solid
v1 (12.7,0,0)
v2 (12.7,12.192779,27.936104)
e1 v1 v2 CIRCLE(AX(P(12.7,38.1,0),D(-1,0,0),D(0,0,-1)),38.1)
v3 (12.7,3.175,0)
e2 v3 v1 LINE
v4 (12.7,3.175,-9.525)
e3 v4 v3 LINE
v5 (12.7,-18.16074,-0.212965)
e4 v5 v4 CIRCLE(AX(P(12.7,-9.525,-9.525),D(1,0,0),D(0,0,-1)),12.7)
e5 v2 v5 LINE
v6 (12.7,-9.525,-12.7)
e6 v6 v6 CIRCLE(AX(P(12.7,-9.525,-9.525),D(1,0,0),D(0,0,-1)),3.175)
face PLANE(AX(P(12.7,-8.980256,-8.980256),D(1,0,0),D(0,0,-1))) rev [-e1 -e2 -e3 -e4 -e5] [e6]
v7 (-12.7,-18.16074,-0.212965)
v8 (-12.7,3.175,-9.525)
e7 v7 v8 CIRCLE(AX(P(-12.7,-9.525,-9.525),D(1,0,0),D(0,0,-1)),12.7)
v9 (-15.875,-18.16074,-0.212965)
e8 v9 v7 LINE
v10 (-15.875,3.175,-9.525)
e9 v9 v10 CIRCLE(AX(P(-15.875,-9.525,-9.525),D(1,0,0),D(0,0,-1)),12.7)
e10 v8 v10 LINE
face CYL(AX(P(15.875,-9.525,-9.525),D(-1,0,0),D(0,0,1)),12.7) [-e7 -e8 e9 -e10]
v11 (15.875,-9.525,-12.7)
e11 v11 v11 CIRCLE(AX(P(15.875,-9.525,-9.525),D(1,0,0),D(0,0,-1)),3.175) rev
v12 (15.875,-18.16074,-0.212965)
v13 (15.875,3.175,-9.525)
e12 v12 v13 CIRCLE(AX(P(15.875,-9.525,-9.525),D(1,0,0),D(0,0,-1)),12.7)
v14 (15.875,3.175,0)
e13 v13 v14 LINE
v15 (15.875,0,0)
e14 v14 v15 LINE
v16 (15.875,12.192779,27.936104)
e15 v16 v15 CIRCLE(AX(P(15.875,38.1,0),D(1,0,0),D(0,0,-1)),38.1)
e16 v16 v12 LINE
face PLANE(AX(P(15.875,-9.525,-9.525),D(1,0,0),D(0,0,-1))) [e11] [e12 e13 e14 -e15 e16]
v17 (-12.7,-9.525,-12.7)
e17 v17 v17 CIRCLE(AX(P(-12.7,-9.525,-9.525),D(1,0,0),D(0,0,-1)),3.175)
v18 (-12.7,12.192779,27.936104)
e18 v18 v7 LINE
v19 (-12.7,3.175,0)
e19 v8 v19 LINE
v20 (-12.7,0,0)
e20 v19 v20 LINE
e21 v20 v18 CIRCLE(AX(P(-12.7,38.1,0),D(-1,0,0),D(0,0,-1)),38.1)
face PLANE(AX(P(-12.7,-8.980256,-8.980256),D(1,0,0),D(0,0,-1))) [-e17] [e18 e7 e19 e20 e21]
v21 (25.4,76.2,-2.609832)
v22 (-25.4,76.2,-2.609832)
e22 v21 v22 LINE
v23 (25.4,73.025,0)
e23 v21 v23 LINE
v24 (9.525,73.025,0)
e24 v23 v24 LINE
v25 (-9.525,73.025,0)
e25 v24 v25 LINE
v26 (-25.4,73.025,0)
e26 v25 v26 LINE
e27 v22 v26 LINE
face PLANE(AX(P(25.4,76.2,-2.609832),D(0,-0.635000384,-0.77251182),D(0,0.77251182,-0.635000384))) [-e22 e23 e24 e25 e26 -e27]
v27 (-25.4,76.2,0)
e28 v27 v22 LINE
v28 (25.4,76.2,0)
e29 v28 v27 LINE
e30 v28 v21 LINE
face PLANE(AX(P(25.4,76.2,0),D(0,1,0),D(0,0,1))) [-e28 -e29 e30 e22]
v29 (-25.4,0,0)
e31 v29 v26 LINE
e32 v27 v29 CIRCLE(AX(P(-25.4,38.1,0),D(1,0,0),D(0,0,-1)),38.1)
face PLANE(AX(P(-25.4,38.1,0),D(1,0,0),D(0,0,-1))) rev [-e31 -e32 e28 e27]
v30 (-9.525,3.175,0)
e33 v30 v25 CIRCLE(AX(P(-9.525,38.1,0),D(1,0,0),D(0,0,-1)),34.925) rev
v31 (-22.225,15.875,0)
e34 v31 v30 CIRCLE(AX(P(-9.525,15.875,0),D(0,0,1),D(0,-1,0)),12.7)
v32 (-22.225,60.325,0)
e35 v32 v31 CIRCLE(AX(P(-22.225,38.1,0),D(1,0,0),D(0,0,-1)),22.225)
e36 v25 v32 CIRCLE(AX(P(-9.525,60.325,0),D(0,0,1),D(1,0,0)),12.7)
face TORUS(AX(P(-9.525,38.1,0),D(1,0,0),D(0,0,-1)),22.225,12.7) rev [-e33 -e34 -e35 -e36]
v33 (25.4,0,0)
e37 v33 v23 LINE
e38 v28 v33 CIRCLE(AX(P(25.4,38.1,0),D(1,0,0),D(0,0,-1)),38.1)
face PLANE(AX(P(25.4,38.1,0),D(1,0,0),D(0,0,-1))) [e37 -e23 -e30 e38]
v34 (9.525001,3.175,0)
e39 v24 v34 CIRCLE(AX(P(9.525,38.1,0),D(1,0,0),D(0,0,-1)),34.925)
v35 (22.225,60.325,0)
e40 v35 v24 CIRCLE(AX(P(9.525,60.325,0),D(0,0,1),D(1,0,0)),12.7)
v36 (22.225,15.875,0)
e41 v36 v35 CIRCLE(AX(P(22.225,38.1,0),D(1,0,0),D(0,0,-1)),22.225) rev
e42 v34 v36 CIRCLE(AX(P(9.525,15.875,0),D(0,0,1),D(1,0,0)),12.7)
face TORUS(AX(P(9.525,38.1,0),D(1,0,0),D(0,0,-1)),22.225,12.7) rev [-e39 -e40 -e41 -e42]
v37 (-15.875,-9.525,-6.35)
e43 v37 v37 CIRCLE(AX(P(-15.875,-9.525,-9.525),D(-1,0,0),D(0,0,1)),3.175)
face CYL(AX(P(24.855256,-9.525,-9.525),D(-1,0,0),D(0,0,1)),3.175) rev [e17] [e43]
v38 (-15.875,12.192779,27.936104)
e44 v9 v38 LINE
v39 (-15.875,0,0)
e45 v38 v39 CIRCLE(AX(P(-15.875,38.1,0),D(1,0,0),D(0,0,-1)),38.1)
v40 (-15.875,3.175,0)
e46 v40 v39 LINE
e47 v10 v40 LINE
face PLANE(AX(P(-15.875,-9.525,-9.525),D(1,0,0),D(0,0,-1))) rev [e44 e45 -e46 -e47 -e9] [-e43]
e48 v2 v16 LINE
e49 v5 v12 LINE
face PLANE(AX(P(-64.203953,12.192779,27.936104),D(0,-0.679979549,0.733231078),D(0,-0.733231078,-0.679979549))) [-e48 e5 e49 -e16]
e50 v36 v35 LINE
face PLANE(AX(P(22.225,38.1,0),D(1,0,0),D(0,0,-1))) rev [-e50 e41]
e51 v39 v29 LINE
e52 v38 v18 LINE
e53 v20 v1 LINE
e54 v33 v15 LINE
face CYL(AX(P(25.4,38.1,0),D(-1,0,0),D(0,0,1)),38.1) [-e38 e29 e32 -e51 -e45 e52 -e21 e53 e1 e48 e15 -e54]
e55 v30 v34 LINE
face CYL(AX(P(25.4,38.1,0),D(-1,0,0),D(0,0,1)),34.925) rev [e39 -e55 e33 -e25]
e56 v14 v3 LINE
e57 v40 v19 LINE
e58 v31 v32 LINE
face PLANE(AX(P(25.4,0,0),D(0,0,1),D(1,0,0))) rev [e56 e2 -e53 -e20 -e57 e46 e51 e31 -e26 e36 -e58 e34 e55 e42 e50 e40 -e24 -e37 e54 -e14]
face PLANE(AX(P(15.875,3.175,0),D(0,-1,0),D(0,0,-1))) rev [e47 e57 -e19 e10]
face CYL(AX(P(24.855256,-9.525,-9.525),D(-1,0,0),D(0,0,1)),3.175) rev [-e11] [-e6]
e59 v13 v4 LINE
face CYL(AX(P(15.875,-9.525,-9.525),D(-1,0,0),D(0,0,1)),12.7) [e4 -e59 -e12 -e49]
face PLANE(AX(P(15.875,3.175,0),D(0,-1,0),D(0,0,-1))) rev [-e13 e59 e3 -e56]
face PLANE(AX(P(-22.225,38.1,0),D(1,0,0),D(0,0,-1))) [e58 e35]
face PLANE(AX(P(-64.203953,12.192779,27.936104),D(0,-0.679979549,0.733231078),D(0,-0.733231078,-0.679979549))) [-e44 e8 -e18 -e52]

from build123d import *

# Parameters (mm, degrees)
BOSS_EXTRUDE1_DEPTH = 25.4
SHELL1_T            = -3.175
SKETCH4_R           = 12.7
BOSS_EXTRUDE3_DEPTH = 15.875
BOSS_EXTRUDE4_DEPTH = 15.875
SKETCH6_R           = 12.7
CUT_EXTRUDE2_DEPTH  = 12.7
CUT_EXTRUDE3_START  = 12.7
SKETCH6_2_R         = 12.7
CUT_EXTRUDE3_DEPTH  = 12.7
CUT_EXTRUDE4_REACH  = 96.666
SKETCH7_R           = 3.175
BOSS_EXTRUDE5_REACH = 96.666
CUT_EXTRUDE5_DEPTH  = 12.7
BOSS_EXTRUDE6_DEPTH = 25.4
FILLET2_R           = 12.7


with BuildPart() as part:
    # Sketch2 → Boss-Extrude1 (new, symmetric)
    with BuildSketch(Plane(origin=(0, 0, 0), x_dir=(0, 0, -1), z_dir=(1, 0, 0))):
        with BuildLine():
            Line((0, 0), (0, 76.2))
            ThreePointArc((0, 76.2), (-38.1, 38.1), (0, 0))
        make_face()
    extrude(amount=BOSS_EXTRUDE1_DEPTH, both=True)

    # Shell1
    shell1_openings = [part.faces().sort_by_distance(p)[0] for p in [
        (0, 38.1, 0),
    ]]
    offset(amount=SHELL1_T, openings=shell1_openings)



with BuildPart() as body_2:
    # Sketch4 → Boss-Extrude3 (new, symmetric)
    with BuildSketch(Plane(origin=(0, 0, 0), x_dir=(0, 0, -1), z_dir=(1, 0, 0))):
        with Locations((9.525, -9.525)):
            Circle(SKETCH4_R)
    extrude(amount=BOSS_EXTRUDE3_DEPTH, both=True)


with BuildPart() as part_1:
    add(part.part)

    add(body_2.part)  # Boss-Extrude4 merges body 2
    # Sketch5 → Boss-Extrude4 (add, symmetric)
    with BuildSketch(Plane(origin=(0, 0, 0), x_dir=(0, 0, -1), z_dir=(1, 0, 0))):
        with BuildLine():
            Line((0, 3.175), (0, 0))
            Line((0, 0), (1.124739587, 0))
            ThreePointArc((1.124739587, 0), (5.034871939, 2.354762203), (9.525, 3.175))
            Line((9.525, 3.175), (0, 3.175))
        make_face()
    extrude(amount=BOSS_EXTRUDE4_DEPTH, both=True)

    # Sketch6 → Cut-Extrude2 (cut)
    with BuildSketch(Plane(origin=(0, 0, 0), x_dir=(0, 0, -1), z_dir=(1, 0, 0))):
        with Locations((8.980256121, -8.980256121)):
            Circle(SKETCH6_R)
    extrude(amount=-CUT_EXTRUDE2_DEPTH, mode=Mode.SUBTRACT)

    # Sketch6<2> → Cut-Extrude3 (cut)
    with BuildSketch(Plane(origin=(0, 0, 0), x_dir=(0, 0, -1), z_dir=(1, 0, 0)).offset(CUT_EXTRUDE3_START)):
        with Locations((8.980256121, -8.980256121)):
            Circle(SKETCH6_2_R)
    extrude(amount=-CUT_EXTRUDE3_DEPTH, mode=Mode.SUBTRACT)

    # Cut-Extrude4: up to this face of the body (flat: up to its plane)
    cut_extrude4_end = Plane(part_1.part.faces().sort_by_distance((15.875, -9.258016607, -9.360446087))[0])
    # Sketch7 → Cut-Extrude4 (cut, up to the picked face)
    with BuildSketch(Plane.ZY.offset(15.875), mode=Mode.PRIVATE) as cut_extrude4_sk1:
        with Locations(Location((-9.525, -9.525, 0), (0, 0, 180))):
            Circle(SKETCH7_R)
    cut_extrude4_tool1 = split(extrude(cut_extrude4_sk1.sketch, amount=-CUT_EXTRUDE4_REACH, mode=Mode.PRIVATE), bisect_by=cut_extrude4_end, keep=Keep.BOTH, mode=Mode.PRIVATE)
    add(cut_extrude4_tool1.solids().sort_by(Axis((-15.875, -9.525, -9.525), (1, 0, 0)))[0], mode=Mode.SUBTRACT)

    # Boss-Extrude5: up to this face of the body (flat: up to its plane)
    boss_extrude5_end = Plane(part_1.part.faces().sort_by_distance((-15.875, 2.815789755, -4.7625))[0])
    # Sketch8 → Boss-Extrude5 (add, up to the picked face)
    with BuildSketch(Plane(origin=(15.875, 0, 0), x_dir=(0, 0, -1), z_dir=(1, 0, 0)), mode=Mode.PRIVATE) as boss_extrude5_sk1:
        with BuildLine():
            Line((-27.936104056, 12.192779189), (0.212965315, -18.16074027))
            Line((0.212965315, -18.16074027), (5.034871939, -21.404762203))
            Line((5.034871939, -21.404762203), (1.124739587, 0))
            Line((1.124739587, 0), (0, 3.175))
            ThreePointArc((0, 3.175), (-13.704863106, 5.9762961), (-25.211222013, 13.9308066))
            Line((-25.211222013, 13.9308066), (-27.936104056, 12.192779189))
        make_face()
    boss_extrude5_tool1 = split(extrude(boss_extrude5_sk1.sketch, amount=-BOSS_EXTRUDE5_REACH, mode=Mode.PRIVATE), bisect_by=boss_extrude5_end, keep=Keep.BOTH, mode=Mode.PRIVATE)
    add(boss_extrude5_tool1.solids().sort_by(Axis((15.875, -2.840531, 7.724646), (-1, 0, 0)))[0])

    # Sketch9 → Cut-Extrude5 (cut, symmetric)
    with BuildSketch(Plane(origin=(0, 0, 0), x_dir=(0, 0, -1), z_dir=(1, 0, 0))):
        with BuildLine():
            Line((0, 3.175), (0, 0))
            ThreePointArc((0, 0), (-15.240486985, 3.180985746), (-27.936104056, 12.192779189))
            Line((-27.936104056, 12.192779189), (0.212965315, -18.16074027))
            ThreePointArc((0.212965315, -18.16074027), (21.164671418, -14.605162328), (9.525, 3.175))
            Line((9.525, 3.175), (0, 3.175))
        make_face()
    extrude(amount=CUT_EXTRUDE5_DEPTH, both=True, mode=Mode.SUBTRACT)

    # Sketch11 → Boss-Extrude6 (add, symmetric)
    with BuildSketch(Plane(origin=(0, 0, 0), x_dir=(0, 0, -1), z_dir=(1, 0, 0))):
        Polygon((2.609832197, 76.2), (0, 76.2), (0, 73.025), align=None)
    extrude(amount=BOSS_EXTRUDE6_DEPTH, both=True)

    # Fillet2
    # the kernel refuses this fillet: 12.7 mm, written as the material it adds along each edge
    with BuildSketch(Plane(origin=(-22.225, 38.1, 0), x_dir=(0, 1, 0), z_dir=(0, 0, -1))) as fillet2_piece_1:
        with BuildLine():
            CenterArc((34.925 - FILLET2_R, FILLET2_R), FILLET2_R, 270, 90)
            Line((34.925 - FILLET2_R, 0), (34.925, 0))
            Line((34.925, 0), (34.925, FILLET2_R))
        make_face()
    revolve(axis=Axis((-22.225, 38.1, 0), (1, 0, 0)), revolution_arc=180)
    with BuildSketch(Plane(origin=(22.225, 38.1, 0), x_dir=(0, 1, 0), z_dir=(0, 0, -1))) as fillet2_piece_2:
        with BuildLine():
            CenterArc((34.925 - FILLET2_R, -FILLET2_R), FILLET2_R, 0, 90)
            Line((34.925 - FILLET2_R, 0), (34.925, 0))
            Line((34.925, 0), (34.925, -FILLET2_R))
        make_face()
    revolve(axis=Axis((22.225, 38.1, 0), (1, 0, 0)), revolution_arc=180)


solid = part_1.part
